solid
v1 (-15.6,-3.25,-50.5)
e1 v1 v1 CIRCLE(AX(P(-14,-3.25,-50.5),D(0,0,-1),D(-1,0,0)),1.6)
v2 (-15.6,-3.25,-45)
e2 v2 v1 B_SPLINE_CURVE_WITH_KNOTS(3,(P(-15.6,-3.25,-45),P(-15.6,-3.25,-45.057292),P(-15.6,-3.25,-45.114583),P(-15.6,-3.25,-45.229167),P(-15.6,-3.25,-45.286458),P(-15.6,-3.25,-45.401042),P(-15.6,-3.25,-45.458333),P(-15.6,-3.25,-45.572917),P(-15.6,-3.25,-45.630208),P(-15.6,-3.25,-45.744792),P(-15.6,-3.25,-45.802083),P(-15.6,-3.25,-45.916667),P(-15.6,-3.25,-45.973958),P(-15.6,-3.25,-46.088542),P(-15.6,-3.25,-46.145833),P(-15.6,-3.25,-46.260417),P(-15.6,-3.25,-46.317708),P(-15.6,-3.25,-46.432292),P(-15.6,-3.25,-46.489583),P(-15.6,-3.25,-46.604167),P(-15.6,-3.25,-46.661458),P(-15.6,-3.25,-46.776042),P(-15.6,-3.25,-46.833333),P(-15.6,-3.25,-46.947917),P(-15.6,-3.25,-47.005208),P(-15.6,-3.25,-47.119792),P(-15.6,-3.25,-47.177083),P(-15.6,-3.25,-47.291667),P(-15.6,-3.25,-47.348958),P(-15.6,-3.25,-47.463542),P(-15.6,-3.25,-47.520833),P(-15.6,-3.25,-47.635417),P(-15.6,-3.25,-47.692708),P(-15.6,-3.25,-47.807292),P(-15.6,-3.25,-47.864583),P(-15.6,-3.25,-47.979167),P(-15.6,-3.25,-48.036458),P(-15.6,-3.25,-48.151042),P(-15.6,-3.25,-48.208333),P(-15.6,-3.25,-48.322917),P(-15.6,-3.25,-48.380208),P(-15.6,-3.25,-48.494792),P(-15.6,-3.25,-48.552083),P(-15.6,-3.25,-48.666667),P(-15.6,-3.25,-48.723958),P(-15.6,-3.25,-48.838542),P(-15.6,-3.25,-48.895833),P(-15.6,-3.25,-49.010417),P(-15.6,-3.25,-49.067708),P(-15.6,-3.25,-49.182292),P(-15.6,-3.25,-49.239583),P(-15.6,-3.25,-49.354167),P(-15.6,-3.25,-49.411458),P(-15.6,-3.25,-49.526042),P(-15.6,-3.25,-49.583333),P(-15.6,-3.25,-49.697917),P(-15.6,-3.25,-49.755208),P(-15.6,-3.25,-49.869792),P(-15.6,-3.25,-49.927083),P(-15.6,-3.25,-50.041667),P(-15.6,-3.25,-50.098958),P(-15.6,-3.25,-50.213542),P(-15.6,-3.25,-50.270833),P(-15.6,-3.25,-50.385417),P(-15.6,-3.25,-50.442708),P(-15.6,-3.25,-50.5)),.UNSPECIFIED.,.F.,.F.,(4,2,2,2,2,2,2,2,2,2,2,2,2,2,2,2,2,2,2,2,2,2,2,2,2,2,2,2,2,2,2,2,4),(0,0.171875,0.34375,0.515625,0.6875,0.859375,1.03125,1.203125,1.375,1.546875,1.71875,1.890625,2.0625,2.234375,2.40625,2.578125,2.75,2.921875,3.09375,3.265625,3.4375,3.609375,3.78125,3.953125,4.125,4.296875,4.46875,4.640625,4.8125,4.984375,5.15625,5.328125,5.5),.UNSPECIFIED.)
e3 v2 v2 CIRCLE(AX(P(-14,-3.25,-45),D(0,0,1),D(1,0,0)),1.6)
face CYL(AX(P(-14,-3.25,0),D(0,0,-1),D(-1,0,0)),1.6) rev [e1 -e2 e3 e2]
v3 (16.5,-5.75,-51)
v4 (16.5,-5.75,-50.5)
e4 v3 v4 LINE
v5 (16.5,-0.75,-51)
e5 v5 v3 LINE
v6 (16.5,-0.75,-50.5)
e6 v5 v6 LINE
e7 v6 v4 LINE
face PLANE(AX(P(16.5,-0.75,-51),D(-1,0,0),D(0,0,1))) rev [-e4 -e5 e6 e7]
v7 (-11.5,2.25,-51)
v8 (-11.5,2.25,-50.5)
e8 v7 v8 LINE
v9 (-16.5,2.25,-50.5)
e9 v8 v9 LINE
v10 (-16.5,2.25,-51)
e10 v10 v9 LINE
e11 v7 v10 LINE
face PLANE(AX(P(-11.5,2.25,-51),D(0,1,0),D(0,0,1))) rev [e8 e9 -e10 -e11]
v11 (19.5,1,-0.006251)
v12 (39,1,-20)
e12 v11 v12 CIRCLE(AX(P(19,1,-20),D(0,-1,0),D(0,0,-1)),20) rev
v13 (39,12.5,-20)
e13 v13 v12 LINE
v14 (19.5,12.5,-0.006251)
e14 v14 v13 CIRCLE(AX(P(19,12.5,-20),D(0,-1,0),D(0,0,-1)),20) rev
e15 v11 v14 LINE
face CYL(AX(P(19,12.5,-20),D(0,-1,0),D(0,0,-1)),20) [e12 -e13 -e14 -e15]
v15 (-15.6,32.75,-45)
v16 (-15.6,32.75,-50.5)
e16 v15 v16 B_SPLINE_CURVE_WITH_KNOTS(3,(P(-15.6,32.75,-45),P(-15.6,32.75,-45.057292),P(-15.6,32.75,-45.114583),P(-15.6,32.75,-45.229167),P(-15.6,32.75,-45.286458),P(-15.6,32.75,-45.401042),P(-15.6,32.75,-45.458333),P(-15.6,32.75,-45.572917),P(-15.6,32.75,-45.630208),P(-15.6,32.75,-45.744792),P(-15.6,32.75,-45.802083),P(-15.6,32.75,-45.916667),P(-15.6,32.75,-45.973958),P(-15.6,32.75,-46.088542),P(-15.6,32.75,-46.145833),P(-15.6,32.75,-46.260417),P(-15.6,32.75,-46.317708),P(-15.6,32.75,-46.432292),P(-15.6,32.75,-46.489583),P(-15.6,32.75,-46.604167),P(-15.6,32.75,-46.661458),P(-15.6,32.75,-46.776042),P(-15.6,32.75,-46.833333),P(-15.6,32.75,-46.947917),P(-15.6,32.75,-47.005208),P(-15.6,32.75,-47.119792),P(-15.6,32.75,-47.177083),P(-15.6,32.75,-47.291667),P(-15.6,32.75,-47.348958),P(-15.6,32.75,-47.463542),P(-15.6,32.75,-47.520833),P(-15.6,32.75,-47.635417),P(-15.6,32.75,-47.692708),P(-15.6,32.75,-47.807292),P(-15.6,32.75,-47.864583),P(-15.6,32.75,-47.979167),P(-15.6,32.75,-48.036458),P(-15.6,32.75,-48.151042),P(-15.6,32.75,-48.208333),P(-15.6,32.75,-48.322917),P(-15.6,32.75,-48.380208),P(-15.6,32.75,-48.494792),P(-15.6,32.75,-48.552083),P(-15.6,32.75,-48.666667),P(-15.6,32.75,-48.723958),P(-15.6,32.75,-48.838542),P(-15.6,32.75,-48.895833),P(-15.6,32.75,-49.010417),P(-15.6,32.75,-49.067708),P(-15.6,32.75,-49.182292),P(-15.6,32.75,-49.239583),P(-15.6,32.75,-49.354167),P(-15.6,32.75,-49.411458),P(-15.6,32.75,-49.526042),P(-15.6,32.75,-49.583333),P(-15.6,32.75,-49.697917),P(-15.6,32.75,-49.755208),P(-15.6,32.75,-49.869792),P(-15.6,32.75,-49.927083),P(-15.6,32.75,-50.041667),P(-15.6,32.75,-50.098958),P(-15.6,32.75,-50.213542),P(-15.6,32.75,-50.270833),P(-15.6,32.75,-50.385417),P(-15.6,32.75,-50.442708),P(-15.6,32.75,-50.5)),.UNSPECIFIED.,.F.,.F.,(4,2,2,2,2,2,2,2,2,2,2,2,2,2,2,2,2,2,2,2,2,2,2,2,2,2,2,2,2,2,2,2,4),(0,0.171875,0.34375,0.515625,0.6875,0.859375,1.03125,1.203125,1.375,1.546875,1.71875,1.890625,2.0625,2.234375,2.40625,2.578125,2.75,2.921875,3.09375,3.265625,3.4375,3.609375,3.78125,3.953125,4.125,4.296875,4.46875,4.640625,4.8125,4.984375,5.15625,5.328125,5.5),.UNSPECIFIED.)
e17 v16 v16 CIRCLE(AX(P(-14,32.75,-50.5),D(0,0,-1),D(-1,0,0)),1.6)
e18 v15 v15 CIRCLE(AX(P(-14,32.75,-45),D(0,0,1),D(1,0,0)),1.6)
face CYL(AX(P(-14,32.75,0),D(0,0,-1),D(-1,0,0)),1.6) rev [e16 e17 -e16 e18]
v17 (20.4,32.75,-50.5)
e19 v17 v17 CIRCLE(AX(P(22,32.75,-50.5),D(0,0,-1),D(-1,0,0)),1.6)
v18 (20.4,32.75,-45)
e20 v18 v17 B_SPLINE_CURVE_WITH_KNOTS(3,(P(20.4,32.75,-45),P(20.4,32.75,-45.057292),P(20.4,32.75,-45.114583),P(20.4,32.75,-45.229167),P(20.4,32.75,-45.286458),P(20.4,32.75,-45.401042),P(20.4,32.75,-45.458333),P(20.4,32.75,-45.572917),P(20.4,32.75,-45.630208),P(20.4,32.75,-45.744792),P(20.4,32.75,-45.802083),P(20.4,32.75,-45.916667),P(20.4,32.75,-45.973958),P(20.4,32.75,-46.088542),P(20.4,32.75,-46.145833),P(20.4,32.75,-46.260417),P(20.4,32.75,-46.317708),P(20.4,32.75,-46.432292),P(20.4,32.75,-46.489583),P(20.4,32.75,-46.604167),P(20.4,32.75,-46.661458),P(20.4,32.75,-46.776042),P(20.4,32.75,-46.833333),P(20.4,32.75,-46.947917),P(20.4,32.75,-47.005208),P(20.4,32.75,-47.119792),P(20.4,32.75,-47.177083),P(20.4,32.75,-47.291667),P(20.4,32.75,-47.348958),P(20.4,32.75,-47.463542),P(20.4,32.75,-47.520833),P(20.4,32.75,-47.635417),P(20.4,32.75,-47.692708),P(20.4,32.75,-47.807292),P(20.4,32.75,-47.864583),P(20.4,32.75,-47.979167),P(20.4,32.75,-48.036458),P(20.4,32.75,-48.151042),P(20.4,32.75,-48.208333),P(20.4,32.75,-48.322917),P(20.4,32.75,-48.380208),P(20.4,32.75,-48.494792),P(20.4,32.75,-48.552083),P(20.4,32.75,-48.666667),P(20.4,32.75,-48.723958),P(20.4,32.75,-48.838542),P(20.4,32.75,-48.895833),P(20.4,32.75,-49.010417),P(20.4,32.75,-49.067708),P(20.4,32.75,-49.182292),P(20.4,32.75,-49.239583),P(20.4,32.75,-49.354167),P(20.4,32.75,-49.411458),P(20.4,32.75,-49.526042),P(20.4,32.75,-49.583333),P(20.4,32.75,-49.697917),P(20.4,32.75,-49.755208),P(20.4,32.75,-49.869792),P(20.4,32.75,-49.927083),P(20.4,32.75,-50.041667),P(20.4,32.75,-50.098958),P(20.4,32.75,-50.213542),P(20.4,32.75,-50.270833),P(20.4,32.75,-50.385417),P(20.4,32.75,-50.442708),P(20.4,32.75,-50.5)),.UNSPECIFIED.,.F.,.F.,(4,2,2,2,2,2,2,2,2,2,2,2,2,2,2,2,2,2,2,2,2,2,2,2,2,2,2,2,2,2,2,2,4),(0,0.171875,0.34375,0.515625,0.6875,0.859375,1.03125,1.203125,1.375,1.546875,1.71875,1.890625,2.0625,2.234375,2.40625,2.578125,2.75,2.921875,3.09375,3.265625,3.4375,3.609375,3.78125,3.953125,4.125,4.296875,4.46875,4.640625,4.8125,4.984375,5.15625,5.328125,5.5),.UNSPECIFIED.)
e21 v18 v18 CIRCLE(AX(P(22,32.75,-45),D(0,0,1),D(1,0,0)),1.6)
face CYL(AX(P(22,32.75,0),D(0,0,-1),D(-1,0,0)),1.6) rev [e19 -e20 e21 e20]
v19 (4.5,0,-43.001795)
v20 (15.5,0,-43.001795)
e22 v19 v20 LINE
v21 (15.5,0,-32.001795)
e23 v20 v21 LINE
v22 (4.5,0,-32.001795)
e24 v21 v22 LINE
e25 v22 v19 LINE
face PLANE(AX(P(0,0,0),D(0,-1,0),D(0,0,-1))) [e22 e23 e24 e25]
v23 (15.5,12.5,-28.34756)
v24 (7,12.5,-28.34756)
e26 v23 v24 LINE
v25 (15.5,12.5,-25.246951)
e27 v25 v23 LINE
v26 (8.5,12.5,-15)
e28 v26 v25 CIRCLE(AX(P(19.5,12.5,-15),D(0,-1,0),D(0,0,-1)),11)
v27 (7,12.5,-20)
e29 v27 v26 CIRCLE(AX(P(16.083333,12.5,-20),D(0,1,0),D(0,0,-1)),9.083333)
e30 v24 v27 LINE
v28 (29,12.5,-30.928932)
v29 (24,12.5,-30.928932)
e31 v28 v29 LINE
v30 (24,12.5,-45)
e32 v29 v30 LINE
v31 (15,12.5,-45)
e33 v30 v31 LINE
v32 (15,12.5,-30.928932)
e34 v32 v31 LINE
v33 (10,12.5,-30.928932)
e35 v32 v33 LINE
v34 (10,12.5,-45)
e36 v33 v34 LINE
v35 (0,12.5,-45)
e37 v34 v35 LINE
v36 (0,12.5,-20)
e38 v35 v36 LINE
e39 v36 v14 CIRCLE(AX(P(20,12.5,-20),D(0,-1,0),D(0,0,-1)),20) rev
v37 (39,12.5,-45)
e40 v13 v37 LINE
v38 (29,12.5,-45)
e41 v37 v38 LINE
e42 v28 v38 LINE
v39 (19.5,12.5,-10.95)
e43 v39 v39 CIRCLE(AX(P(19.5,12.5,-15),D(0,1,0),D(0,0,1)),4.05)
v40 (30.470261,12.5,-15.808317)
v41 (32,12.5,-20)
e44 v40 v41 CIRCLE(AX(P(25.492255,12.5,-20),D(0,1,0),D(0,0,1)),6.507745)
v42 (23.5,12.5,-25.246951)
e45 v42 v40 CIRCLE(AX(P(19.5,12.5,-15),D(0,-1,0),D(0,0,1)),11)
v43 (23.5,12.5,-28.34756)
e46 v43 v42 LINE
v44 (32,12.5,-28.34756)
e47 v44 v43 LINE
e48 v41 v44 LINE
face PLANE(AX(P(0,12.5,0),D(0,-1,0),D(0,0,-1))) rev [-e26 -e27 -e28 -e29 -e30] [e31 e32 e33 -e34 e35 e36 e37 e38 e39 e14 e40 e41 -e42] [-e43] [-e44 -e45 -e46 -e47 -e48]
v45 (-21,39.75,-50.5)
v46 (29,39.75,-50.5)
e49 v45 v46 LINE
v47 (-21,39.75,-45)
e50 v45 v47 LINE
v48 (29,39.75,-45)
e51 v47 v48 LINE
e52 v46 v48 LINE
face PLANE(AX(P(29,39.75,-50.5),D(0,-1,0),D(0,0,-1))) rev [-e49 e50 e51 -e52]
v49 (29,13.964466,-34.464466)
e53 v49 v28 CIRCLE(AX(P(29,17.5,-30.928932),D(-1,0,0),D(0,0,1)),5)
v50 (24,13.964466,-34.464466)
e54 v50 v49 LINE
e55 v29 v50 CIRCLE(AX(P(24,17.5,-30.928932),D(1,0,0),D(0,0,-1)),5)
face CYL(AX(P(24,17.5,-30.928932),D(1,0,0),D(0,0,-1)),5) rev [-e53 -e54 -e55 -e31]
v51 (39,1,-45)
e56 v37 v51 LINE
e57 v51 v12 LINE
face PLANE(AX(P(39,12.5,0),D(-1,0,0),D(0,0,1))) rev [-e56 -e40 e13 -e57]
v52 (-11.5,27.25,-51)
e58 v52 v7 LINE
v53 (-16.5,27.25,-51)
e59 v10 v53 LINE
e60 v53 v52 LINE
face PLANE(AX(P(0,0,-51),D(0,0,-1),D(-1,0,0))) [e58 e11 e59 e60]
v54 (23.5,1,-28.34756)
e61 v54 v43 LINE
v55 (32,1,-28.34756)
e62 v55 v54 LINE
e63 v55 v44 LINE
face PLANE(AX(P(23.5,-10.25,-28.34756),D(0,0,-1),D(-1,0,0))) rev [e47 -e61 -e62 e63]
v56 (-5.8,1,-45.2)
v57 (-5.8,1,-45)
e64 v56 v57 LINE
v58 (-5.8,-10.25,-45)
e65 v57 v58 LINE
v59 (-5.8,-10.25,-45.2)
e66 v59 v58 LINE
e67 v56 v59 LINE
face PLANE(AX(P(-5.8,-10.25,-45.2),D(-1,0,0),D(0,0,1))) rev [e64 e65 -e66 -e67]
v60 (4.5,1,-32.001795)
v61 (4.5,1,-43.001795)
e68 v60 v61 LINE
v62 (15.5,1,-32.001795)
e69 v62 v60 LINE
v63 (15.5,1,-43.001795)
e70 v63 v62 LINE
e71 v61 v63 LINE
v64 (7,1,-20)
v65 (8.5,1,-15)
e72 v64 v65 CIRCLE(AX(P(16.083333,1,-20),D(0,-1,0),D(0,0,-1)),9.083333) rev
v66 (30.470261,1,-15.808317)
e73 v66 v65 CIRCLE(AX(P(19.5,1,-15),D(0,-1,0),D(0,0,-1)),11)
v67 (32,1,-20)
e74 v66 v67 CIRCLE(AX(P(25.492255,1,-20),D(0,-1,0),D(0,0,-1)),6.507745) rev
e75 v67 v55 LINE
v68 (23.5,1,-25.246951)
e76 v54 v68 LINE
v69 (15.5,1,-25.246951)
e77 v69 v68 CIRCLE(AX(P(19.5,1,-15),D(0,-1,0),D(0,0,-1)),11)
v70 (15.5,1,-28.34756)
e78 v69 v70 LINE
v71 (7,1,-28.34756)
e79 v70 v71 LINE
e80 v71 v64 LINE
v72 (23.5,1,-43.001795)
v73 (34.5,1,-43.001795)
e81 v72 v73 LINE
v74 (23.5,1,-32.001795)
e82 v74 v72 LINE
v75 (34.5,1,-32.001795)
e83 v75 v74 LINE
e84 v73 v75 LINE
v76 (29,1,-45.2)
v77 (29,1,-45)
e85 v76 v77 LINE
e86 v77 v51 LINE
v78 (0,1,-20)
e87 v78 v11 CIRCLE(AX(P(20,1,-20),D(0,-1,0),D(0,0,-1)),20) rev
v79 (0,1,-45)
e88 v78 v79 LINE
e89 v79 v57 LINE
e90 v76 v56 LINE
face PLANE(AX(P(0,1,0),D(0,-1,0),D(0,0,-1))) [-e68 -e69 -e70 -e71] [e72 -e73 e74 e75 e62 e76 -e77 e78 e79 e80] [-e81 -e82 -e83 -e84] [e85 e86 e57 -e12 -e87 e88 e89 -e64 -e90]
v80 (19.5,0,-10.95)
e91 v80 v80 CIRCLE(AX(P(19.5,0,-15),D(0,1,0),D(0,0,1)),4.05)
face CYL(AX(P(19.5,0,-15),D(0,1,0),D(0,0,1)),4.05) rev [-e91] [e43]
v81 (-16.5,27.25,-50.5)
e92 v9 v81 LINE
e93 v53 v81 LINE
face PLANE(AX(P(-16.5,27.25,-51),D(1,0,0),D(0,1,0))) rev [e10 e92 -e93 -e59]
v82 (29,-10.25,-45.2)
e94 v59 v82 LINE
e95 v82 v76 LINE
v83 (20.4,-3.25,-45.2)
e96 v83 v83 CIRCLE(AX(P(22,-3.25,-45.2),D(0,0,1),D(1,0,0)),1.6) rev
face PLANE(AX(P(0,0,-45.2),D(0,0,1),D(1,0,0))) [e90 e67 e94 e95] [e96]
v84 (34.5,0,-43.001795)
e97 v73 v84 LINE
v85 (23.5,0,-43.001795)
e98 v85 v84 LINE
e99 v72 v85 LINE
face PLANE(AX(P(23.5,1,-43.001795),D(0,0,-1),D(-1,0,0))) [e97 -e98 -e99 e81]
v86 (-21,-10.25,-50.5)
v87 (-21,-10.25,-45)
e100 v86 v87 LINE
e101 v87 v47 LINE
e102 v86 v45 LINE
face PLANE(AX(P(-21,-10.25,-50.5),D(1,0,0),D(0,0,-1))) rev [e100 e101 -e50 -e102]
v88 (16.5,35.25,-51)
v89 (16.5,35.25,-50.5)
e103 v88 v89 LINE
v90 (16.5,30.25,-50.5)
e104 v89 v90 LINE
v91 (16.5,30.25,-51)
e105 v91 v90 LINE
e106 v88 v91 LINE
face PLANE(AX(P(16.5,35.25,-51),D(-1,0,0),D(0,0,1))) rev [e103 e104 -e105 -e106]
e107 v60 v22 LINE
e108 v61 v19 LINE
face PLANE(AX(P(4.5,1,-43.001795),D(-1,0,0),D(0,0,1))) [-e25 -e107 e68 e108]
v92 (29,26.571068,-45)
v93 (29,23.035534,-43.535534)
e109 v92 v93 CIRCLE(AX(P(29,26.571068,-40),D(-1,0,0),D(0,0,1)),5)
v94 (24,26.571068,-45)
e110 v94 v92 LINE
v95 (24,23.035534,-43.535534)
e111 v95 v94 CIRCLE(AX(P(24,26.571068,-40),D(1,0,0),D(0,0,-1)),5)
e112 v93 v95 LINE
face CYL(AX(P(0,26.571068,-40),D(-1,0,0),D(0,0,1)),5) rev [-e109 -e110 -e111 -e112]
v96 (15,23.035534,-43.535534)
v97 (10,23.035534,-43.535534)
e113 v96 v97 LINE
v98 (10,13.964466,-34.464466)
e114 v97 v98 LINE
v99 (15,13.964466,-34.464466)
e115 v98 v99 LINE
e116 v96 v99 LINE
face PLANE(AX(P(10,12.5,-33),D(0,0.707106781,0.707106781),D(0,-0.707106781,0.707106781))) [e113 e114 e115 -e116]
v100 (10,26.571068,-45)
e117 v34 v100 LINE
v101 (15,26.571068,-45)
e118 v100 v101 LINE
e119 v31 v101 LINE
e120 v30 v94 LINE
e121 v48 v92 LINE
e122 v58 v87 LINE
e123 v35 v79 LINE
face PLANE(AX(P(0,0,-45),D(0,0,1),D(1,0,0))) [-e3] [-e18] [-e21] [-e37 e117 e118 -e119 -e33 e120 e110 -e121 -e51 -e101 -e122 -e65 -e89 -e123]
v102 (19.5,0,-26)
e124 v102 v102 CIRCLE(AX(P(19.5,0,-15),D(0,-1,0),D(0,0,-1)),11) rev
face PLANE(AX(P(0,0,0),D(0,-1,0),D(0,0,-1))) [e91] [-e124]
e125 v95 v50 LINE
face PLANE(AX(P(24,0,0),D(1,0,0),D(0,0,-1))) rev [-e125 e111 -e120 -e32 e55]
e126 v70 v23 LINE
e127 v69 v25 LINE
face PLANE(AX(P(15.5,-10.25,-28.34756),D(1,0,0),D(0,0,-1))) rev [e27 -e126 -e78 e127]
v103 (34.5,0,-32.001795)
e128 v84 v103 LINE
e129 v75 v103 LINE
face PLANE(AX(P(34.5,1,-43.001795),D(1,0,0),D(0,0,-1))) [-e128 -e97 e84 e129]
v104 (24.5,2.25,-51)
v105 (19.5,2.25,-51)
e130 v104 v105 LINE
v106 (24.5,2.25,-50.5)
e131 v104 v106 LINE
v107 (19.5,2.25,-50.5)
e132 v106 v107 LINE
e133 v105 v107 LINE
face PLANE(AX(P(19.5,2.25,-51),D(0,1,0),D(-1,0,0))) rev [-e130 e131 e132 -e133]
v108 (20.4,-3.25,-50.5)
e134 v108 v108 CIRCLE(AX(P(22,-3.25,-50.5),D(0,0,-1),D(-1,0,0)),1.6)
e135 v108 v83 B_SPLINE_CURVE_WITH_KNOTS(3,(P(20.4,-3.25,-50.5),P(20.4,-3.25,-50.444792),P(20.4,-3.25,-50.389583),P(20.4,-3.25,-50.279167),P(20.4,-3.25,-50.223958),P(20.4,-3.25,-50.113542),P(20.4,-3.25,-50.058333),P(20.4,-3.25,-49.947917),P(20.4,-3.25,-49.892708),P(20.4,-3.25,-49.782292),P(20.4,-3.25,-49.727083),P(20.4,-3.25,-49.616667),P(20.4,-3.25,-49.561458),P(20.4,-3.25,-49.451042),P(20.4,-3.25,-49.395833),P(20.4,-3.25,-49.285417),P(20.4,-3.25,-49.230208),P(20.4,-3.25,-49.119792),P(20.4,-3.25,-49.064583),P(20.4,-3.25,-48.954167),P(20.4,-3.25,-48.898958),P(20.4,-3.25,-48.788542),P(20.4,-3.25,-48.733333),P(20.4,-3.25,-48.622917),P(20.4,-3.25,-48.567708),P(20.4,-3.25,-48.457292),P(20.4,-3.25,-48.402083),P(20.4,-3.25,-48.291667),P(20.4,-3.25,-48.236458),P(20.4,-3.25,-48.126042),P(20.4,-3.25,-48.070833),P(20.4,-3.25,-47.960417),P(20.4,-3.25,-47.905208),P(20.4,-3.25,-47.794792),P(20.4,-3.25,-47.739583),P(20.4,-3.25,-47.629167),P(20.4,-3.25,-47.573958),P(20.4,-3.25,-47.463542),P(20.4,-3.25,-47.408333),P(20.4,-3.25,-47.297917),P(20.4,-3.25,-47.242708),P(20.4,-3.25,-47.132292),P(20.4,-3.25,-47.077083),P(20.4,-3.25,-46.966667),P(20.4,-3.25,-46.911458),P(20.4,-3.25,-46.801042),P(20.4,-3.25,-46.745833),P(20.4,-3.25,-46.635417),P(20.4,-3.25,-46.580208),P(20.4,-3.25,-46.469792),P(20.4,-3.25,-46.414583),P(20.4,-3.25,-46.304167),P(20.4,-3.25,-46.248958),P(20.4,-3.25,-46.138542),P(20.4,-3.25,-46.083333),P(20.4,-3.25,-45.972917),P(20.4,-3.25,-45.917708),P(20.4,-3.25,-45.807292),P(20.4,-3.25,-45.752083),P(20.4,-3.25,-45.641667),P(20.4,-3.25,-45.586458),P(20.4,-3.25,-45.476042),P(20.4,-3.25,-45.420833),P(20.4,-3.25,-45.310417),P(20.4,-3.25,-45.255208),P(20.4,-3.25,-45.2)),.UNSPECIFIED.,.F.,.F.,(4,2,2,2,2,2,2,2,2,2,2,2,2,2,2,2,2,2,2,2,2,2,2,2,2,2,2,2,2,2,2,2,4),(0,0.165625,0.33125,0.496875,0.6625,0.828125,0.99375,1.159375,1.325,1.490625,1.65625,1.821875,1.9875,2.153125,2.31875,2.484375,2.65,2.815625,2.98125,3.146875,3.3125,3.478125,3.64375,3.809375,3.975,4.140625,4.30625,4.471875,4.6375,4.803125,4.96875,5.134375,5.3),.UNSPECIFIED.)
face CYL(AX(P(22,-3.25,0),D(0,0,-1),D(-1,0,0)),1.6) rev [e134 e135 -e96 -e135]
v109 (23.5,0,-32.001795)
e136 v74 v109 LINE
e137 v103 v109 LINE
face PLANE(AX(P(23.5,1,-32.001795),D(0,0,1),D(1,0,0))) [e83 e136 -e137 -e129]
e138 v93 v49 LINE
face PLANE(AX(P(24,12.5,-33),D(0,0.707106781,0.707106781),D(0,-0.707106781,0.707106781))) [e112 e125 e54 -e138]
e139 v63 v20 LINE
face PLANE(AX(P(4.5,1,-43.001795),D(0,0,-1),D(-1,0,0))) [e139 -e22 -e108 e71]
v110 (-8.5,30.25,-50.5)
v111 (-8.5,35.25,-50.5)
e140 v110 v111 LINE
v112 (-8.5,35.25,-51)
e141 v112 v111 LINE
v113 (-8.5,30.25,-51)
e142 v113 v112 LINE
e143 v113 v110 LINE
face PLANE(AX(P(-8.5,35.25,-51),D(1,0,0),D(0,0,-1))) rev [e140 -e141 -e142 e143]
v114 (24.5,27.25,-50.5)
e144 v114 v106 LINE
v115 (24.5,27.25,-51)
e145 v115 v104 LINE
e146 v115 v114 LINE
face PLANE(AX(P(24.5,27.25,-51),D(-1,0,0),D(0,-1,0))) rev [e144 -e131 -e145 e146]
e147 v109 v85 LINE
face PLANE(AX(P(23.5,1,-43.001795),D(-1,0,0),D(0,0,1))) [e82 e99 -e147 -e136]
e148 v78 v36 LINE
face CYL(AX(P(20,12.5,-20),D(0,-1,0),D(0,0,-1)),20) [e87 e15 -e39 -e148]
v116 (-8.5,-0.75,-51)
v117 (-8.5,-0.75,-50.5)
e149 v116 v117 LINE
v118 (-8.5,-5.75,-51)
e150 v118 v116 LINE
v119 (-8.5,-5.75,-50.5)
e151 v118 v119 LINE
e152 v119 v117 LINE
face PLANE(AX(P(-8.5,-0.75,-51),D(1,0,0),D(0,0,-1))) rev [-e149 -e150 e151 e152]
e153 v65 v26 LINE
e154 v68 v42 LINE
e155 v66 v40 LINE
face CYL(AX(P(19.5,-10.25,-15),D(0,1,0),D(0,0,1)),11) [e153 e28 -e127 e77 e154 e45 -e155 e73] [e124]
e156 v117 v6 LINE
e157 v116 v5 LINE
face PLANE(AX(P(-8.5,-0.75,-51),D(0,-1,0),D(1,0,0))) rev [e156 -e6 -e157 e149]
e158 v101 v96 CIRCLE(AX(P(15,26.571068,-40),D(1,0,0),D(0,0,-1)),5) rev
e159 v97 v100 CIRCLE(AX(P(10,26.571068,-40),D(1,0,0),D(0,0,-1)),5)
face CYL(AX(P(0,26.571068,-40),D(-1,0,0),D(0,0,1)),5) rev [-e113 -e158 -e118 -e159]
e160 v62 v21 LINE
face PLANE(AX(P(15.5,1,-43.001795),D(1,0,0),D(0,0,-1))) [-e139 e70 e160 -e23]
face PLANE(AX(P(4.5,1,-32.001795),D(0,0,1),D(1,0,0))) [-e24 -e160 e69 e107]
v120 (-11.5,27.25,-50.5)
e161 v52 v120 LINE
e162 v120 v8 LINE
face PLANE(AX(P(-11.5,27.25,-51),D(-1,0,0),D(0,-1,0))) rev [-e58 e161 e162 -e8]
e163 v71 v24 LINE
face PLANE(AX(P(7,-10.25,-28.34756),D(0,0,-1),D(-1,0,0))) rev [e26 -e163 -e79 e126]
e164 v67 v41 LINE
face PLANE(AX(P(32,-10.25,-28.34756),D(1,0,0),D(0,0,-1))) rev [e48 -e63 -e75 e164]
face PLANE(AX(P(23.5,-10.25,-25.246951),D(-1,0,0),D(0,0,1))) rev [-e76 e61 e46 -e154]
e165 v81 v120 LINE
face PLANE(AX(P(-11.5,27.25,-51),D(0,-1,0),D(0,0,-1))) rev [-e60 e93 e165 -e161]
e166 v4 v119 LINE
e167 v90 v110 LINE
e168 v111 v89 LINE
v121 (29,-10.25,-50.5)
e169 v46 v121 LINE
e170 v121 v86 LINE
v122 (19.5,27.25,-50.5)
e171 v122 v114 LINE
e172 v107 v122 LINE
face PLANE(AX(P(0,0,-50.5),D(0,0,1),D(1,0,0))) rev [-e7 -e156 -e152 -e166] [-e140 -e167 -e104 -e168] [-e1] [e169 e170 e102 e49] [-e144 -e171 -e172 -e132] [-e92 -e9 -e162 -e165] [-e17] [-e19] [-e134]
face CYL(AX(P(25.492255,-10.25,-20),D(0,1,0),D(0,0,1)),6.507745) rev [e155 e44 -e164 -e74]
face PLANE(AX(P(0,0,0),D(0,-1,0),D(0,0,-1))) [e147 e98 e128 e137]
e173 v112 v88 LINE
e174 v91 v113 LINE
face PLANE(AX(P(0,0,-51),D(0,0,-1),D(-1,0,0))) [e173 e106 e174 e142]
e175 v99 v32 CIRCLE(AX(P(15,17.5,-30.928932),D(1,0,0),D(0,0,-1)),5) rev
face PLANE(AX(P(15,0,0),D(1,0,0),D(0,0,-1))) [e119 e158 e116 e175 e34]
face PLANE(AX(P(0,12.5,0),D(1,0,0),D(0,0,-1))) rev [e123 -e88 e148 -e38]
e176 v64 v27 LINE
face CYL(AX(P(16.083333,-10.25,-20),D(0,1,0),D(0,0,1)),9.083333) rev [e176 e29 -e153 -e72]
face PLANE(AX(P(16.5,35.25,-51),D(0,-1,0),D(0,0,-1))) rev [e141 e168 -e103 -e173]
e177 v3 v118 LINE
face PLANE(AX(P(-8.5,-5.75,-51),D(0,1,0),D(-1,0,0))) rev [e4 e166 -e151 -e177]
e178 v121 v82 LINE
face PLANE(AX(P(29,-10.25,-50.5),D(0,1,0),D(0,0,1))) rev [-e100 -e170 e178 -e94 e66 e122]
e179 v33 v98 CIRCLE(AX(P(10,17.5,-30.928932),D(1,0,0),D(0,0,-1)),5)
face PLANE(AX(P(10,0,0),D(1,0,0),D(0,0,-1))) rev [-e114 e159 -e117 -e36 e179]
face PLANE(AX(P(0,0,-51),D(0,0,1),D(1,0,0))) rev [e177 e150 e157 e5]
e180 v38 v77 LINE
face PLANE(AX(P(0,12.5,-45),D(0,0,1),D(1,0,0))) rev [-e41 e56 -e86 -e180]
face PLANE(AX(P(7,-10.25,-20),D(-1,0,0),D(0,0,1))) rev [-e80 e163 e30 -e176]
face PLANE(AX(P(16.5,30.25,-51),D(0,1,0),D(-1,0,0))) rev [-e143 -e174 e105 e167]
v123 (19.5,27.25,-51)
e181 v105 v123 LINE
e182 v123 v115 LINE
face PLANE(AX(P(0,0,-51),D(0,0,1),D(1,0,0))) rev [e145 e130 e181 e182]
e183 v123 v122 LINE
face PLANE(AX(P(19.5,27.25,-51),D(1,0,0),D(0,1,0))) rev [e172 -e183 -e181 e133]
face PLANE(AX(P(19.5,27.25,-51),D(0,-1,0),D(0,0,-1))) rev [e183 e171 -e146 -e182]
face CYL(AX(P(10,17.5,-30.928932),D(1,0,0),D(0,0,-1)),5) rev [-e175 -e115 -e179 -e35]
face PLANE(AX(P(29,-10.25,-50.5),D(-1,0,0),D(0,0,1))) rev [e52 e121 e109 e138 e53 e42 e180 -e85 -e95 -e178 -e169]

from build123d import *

# Parameters (mm, degrees)
SKETCH1_W           = 39
SKETCH1_H           = 45
BOSS_EXTRUDE1_DEPTH = 12.5
SKETCH2_R           = 4.05
CUT_EXTRUDE1_DEPTH  = 61.846117378
SKETCH3_W           = 50
SKETCH3_H           = 50
BOSS_EXTRUDE2_DEPTH = 5.5
BOSS_EXTRUDE3_START = -10
BOSS_EXTRUDE3_DEPTH = 5
LPATTERN1_COUNT     = 2
LPATTERN1_PITCH     = 14
FILLET1_R           = 5
SKETCH5_R           = 1.6
CUT_EXTRUDE2_DEPTH  = 76.175212005
FILLET2_R           = 20
CUT_EXTRUDE3_DEPTH  = 70.381643826
CUT_EXTRUDE4_START  = -1
SKETCH7_W           = 39
SKETCH7_H           = 50.063664736
SKETCH7_R           = 11
SKETCH7_W_2         = 11
SKETCH7_H_2         = 11
CUT_EXTRUDE4_DEPTH  = 1
SKETCH8_W           = 25
SKETCH8_H           = 5
SKETCH8_W_2         = 5
SKETCH8_H_2         = 25
BOSS_EXTRUDE4_DEPTH = 0.5
SKETCH9_W           = 34.8
SKETCH9_H           = 11.25
CUT_EXTRUDE5_DEPTH  = 0.2


with BuildPart() as part:
    # Sketch1 → Boss-Extrude1 (new body)
    with BuildSketch(Plane(origin=(0, 0, 0), x_dir=(1, 0, 0), z_dir=(0, 1, 0))):
        with Locations((19.5, 22.5)):
            Rectangle(SKETCH1_W, SKETCH1_H)
    extrude(amount=BOSS_EXTRUDE1_DEPTH)

    # Sketch2 → Cut-Extrude1 (cut, through all)
    with BuildSketch(Plane(origin=(0, 12.5, 0), x_dir=(1, 0, 0), z_dir=(0, 1, 0))):
        with Locations(Location((19.5, 15, 0), (0, 0, 270))):
            Circle(SKETCH2_R)
    extrude(amount=-CUT_EXTRUDE1_DEPTH, mode=Mode.SUBTRACT)

    # Sketch3 → Boss-Extrude2 (add)
    with BuildSketch(Plane(origin=(0, 0, -45), x_dir=(-1, 0, 0), z_dir=(0, 0, -1))):
        with Locations((-4, 14.75)):
            Rectangle(SKETCH3_W, SKETCH3_H)
    extrude(amount=BOSS_EXTRUDE2_DEPTH)

    # Sketch4 → Boss-Extrude3 (add)
    with BuildSketch(Plane(origin=(39, 0, 0), x_dir=(0, 0, -1), z_dir=(1, 0, 0)).offset(BOSS_EXTRUDE3_START)):
        Polygon((33, 12.5), (45, 24.5), (45, 12.5), align=None)
    boss_extrude3 = extrude(amount=-BOSS_EXTRUDE3_DEPTH)

    # LPattern1: Boss-Extrude3 ×2
    with Locations(*[(-i * LPATTERN1_PITCH, 0, 0) for i in range(1, LPATTERN1_COUNT)]):
        add(boss_extrude3)

    # Fillet1
    fillet1_edges = [part.edges().sort_by_distance(p)[0] for p in [
        (26.5, 12.5, -33),
        (26.5, 24.5, -45),
        (12.5, 12.5, -33),
        (12.5, 24.5, -45),
    ]]
    fillet(fillet1_edges, radius=FILLET1_R)

    # Sketch5 → Cut-Extrude2 (cut, through all)
    with BuildSketch(Plane(origin=(0, 0, -50.5), x_dir=(-1, 0, 0), z_dir=(0, 0, -1))):
        with Locations((-22, 32.75)):
            Circle(SKETCH5_R)
        with Locations((14, 32.75)):
            Circle(SKETCH5_R)
        with Locations((14, -3.25)):
            Circle(SKETCH5_R)
        with Locations((-22, -3.25)):
            Circle(SKETCH5_R)
    extrude(amount=-CUT_EXTRUDE2_DEPTH, mode=Mode.SUBTRACT)

    # Fillet2
    # the kernel refuses this fillet: 20 mm, written as the material it takes off along each edge
    with BuildSketch(Plane(origin=(0, -50, 0), x_dir=(0, 0, -1), z_dir=(0, 1, 0)), Plane(origin=(39, -50, 0), x_dir=(-1, 0, 0), z_dir=(0, 1, 0))) as fillet2_piece_1:
        with BuildLine():
            CenterArc((FILLET2_R, -FILLET2_R), FILLET2_R, 90, 90)
            Line((0, -FILLET2_R), (0, 0))
            Line((0, 0), (FILLET2_R, 0))
        make_face()
    extrude(amount=112.5, mode=Mode.SUBTRACT)

    # Sketch6 → Cut-Extrude3 (cut, through all)
    with BuildSketch(Plane(origin=(0, 12.5, 0), x_dir=(1, 0, 0), z_dir=(0, 1, 0))):
        with BuildLine():
            Line((7, 20), (7, 28.347560338))
            Line((7, 28.347560338), (15.5, 28.347560338))
            Line((15.5, 28.347560338), (15.5, 25.246950766))
            ThreePointArc((15.5, 25.246950766), (10.417048938, 21.204836823), (8.5, 15))
            ThreePointArc((8.5, 15), (7.383077909, 17.389923373), (7, 20))
        make_face()
        with BuildLine():
            Line((23.5, 25.246950766), (23.5, 28.347560338))
            Line((23.5, 28.347560338), (32, 28.347560338))
            Line((32, 28.347560338), (32, 20))
            ThreePointArc((32, 20), (31.605614865, 17.768951725), (30.47026085, 15.808317311))
            ThreePointArc((30.47026085, 15.808317311), (28.348679441, 21.534590434), (23.5, 25.246950766))
        make_face()
    extrude(amount=-CUT_EXTRUDE3_DEPTH, mode=Mode.SUBTRACT)

    # Sketch7 → Cut-Extrude4 (cut)
    with BuildSketch(Plane.XZ.offset(CUT_EXTRUDE4_START)):
        with Locations((19.5, -19.968167632)):
            Rectangle(SKETCH7_W, SKETCH7_H)
        with Locations(Location((19.5, -15, 0), (0, 0, 180))):
            Circle(SKETCH7_R, mode=Mode.SUBTRACT)
        with Locations((10, -37.501795484)):
            Rectangle(SKETCH7_W_2, SKETCH7_H_2, mode=Mode.SUBTRACT)
        with Locations((29, -37.501795484)):
            Rectangle(SKETCH7_W_2, SKETCH7_H_2, mode=Mode.SUBTRACT)
    extrude(amount=CUT_EXTRUDE4_DEPTH, mode=Mode.SUBTRACT)

    # Sketch8 → Boss-Extrude4 (add)
    with BuildSketch(Plane(origin=(0, 0, -50.5), x_dir=(-1, 0, 0), z_dir=(0, 0, -1))):
        with Locations((-4, 32.75)):
            Rectangle(SKETCH8_W, SKETCH8_H)
        with Locations((14, 14.75)):
            Rectangle(SKETCH8_W_2, SKETCH8_H_2)
        with Locations((-4, -3.25)):
            Rectangle(SKETCH8_W, SKETCH8_H)
        with Locations((-22, 14.75)):
            Rectangle(SKETCH8_W_2, SKETCH8_H_2)
    extrude(amount=BOSS_EXTRUDE4_DEPTH)

    # Sketch9 → Cut-Extrude5 (cut)
    with BuildSketch(Plane.XY.offset(-45)):
        with Locations((11.6, -4.625)):
            Rectangle(SKETCH9_W, SKETCH9_H)
    extrude(amount=-CUT_EXTRUDE5_DEPTH, mode=Mode.SUBTRACT)


solid = part.part
